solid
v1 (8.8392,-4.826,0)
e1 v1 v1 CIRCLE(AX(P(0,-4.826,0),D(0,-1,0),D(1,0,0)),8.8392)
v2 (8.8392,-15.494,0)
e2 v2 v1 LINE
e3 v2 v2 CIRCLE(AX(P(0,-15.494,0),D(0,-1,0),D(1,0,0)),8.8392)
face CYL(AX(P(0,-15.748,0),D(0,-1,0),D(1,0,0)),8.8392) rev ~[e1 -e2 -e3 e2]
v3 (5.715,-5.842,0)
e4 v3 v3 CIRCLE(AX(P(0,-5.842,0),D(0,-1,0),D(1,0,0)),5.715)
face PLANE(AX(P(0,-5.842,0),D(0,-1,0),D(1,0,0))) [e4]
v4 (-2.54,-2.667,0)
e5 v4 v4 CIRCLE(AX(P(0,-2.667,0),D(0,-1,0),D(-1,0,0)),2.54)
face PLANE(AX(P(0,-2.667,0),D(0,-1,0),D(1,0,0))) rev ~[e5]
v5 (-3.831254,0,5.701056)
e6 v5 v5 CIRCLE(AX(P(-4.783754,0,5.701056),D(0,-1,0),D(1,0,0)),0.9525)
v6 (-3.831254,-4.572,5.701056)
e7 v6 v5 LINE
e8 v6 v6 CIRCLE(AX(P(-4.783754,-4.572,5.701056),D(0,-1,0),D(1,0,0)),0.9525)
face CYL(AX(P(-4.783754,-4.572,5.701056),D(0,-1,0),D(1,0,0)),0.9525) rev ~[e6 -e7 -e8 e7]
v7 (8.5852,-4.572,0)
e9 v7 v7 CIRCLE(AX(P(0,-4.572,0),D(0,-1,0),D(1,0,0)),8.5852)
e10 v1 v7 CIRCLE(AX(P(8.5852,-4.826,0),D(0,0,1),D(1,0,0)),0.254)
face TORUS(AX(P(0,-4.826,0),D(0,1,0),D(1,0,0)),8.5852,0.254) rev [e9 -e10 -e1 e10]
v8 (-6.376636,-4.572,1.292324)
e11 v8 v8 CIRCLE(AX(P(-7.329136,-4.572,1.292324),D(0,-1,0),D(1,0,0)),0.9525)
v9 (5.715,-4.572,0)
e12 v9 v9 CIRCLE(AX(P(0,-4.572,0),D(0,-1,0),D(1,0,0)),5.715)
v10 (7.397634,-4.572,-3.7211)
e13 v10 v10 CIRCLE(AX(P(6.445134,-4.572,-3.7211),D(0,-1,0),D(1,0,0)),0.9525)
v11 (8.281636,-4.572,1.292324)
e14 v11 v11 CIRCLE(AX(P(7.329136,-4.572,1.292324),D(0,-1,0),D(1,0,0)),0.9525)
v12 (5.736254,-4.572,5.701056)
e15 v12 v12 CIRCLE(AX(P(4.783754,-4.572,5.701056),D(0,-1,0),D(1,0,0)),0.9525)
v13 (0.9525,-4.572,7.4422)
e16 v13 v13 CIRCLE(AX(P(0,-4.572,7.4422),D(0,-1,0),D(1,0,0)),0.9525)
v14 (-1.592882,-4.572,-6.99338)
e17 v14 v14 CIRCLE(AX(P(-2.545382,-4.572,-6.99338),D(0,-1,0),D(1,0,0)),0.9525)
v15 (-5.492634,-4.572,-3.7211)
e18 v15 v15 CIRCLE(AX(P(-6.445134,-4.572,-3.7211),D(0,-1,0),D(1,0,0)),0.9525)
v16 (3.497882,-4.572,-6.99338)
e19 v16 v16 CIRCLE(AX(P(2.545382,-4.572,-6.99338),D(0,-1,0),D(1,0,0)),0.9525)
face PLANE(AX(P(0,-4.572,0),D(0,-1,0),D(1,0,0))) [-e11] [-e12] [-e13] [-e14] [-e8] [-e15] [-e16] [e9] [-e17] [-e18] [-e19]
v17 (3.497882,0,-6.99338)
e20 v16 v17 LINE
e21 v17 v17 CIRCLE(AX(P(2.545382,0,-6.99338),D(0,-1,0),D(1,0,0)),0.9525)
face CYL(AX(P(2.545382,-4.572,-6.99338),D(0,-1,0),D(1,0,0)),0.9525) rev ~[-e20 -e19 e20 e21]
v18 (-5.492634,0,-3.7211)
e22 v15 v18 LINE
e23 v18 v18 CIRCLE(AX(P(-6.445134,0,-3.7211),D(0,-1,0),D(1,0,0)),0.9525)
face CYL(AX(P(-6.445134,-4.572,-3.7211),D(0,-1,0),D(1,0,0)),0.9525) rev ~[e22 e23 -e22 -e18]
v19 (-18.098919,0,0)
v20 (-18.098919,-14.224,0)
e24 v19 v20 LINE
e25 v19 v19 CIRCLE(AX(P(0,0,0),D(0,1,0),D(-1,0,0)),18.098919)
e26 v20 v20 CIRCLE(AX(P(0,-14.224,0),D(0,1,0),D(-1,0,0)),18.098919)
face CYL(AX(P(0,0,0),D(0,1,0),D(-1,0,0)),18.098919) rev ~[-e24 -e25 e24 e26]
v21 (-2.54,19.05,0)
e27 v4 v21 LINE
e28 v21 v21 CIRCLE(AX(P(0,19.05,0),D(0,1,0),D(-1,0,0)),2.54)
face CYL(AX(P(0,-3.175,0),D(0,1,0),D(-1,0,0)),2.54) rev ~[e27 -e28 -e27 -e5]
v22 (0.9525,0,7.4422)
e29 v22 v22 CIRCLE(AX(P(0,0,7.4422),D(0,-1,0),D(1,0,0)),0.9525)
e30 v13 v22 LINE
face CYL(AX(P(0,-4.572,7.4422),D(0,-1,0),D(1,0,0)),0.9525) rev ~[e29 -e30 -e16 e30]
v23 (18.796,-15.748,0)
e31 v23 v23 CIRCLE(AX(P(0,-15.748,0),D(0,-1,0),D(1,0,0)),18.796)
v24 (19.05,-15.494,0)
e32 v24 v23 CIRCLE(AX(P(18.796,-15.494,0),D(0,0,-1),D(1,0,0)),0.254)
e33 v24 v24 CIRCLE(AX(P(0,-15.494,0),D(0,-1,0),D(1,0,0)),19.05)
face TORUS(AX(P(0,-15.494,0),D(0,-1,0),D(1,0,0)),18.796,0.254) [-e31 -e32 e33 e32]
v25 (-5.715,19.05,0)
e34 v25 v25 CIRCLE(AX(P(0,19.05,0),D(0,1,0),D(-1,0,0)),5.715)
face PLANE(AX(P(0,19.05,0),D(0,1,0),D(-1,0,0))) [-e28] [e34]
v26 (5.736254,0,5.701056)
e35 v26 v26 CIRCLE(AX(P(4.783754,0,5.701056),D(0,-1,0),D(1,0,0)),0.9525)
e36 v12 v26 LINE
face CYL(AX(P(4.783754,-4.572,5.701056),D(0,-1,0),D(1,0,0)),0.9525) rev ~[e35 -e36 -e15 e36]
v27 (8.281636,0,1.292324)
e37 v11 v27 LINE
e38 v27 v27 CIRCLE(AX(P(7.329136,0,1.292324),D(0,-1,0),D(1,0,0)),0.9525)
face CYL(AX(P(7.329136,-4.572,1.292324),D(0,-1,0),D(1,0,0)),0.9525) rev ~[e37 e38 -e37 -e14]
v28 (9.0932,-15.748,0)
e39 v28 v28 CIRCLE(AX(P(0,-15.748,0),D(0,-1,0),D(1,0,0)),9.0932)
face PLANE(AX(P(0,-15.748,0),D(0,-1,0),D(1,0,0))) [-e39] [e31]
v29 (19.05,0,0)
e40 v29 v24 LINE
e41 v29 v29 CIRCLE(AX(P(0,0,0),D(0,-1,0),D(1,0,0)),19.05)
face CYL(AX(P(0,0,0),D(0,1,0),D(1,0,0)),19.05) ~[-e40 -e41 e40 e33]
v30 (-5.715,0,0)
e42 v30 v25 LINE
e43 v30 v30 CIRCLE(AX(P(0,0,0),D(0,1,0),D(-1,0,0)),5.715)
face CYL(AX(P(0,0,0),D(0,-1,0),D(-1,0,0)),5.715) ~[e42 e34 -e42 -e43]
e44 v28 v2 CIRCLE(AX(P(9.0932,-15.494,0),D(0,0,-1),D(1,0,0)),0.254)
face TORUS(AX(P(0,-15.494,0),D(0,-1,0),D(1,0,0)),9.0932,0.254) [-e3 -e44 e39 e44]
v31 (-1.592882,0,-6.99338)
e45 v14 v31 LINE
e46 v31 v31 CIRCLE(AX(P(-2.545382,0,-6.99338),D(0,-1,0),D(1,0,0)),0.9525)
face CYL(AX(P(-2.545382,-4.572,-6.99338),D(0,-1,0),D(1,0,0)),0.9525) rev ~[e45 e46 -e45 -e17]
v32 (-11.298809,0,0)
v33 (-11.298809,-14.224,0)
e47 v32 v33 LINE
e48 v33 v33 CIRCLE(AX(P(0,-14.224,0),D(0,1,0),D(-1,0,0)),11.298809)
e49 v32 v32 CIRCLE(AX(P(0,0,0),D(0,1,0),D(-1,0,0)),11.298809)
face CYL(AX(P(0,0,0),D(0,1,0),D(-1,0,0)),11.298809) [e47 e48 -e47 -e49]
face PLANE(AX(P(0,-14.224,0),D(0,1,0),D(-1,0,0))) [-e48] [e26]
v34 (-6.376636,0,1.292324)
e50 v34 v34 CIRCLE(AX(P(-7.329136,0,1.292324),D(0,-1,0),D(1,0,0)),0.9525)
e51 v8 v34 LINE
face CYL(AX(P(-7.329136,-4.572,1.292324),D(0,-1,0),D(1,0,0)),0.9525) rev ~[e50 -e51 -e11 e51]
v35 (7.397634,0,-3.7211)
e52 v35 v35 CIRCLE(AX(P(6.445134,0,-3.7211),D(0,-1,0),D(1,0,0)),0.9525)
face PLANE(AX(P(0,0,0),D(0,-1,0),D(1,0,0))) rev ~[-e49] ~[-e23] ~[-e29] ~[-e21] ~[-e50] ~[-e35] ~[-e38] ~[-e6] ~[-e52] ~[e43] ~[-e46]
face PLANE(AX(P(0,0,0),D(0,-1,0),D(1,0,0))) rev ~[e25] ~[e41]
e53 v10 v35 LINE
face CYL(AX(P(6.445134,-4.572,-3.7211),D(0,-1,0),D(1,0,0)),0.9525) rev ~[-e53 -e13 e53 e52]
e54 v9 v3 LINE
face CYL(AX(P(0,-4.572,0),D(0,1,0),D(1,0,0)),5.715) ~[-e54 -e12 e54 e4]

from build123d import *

# Parameters (mm, degrees)
F0_R      = 19.05
F1_DEPTH  = 15.748
F3_R      = 8.8392
F4_DEPTH  = 11.176
F5_R      = 0.254
F6_R      = 0.9525
F7_DEPTH  = 25.4
F8_R      = 5.715
F9_DEPTH  = 1.27
F11_R     = 18.0989194231
F11_R_2   = 11.2988088197
F12_DEPTH = 14.224
F10_R     = 5.715
F13_DEPTH = 19.05
F14_T     = 3.175


# Not quite as in the source:
# - a feature of the source that left no trace in its solid (it failed there, or was rolled back) is left out
# - a shell that OpenCascade refuses in one call is made with other operations: the cavity is built on its own and cut out


with BuildPart() as f1:
    # F0 (on Front) → F1 (new body)
    with BuildSketch(Plane.XZ):
        Circle(F0_R)
    extrude(amount=F1_DEPTH)

    # F3 (on face) → F4 (cut)
    with BuildSketch(Plane.XZ.offset(15.748)):
        Circle(F3_R)
    extrude(amount=-F4_DEPTH, mode=Mode.SUBTRACT)

    # F5
    f5_edges = [f1.edges().sort_by_distance(p)[0] for p in [
        (-8.8392, -15.748, 0),
        (8.8392, -10.16, 0),
        (-8.8392, -4.572, 0),
        (-19.05, -15.748, 0),
    ]]
    fillet(f5_edges, radius=F5_R)

    # F6 (on face) → F7 (cut)
    with BuildSketch(Plane.XZ.offset(4.572)):
        with Locations((0, 7.4422)):
            Circle(F6_R)
        with Locations((4.7837539488, 5.7010559546)):
            Circle(F6_R)
        with Locations((7.3291362595, 1.2923244678)):
            Circle(F6_R)
        with Locations((6.44513426, -3.7211)):
            Circle(F6_R)
        with Locations((2.5453823107, -6.9933804224)):
            Circle(F6_R)
        with Locations((-2.5453823107, -6.9933804224)):
            Circle(F6_R)
        with Locations((-6.44513426, -3.7211)):
            Circle(F6_R)
        with Locations((-7.3291362595, 1.2923244678)):
            Circle(F6_R)
        with Locations((-4.7837539488, 5.7010559546)):
            Circle(F6_R)
    extrude(amount=-F7_DEPTH, mode=Mode.SUBTRACT)

    # F8 (on face) → F9 (join)
    with BuildSketch(Plane.XZ.offset(4.572)):
        Circle(F8_R)
    extrude(amount=F9_DEPTH)

    # F11 (on face) → F12 (cut)
    with BuildSketch(Plane(origin=(0, 0, 0), x_dir=(-1, 0, 0), z_dir=(0, 1, 0))):
        Circle(F11_R)
        Circle(F11_R_2, mode=Mode.SUBTRACT)
    extrude(amount=-F12_DEPTH, mode=Mode.SUBTRACT)

    # F10 (on face) → F13 (join)
    with BuildSketch(Plane(origin=(0, 0, 0), x_dir=(-1, 0, 0), z_dir=(0, 1, 0))):
        Circle(F10_R)
    extrude(amount=F13_DEPTH)

    # F14: shell of thickness 3.175, made by hand


with BuildPart() as f14_core1:
    # F14_t2: copy of F1
    add(f1.part)

    # the walls: a layer under each face that stays
    f14_faces = [f14_core1.faces().sort_by_distance(p)[0] for p in [
        (-19.05, -7.747, 0),
        (-17.78, 0, -5.08),
        (-12.5306666667, -15.748, -12.5306666667),
        (18.0989194231, -7.112, 0),
        (12.065946282, -14.224, -12.065946282),
        (-8.8392, -10.16, 0),
        (11.2988088197, -7.112, 0),
        (-8.7648051224, -4.6463948776, 0),
        (-7.5325392131, 0, -7.5325392131),
        (-5.7234666667, -4.572, -5.7234666667),
        (-3.4978823107, -2.286, -6.9933804224),
        (-7.39763426, -2.286, -3.7211),
        (1.5928823107, -2.286, -6.9933804224),
        (5.715, 9.525, 0),
        (5.49263426, -2.286, -3.7211),
        (-8.2816362595, -2.286, 1.2923244678),
        (-5.7362539488, -2.286, 5.7010559546),
        (-0.9525, -2.286, 7.4422),
        (6.3766362595, -2.286, 1.2923244678),
        (3.8312539488, -2.286, 5.7010559546),
        (-5.715, -5.207, 0),
        (0, -5.842, 0),
    ]]
    thicken(f14_faces, amount=-F14_T, mode=Mode.SUBTRACT)

    # F14_s3 → F14_t4 (revolve, cut)
    with BuildSketch(Plane.XY):
        Polygon((-18.0671694231, -14.19225), (-21.2739194231, -14.224), (-21.2739194231, -17.399), (-18.0989194231, -17.399), align=None)
    revolve(axis=Axis((0, -14.224, 0), (0, 1, 0)), mode=Mode.SUBTRACT)

    # F14_s5 → F14_t6 (revolve, cut)
    with BuildSketch(Plane.XY):
        Polygon((-11.3305588197, -14.19225), (-11.2988088197, -17.399), (-8.1238088197, -17.399), (-8.1238088197, -14.224), align=None)
    revolve(axis=Axis((0, -14.224, 0), (0, 1, 0)), mode=Mode.SUBTRACT)

    # F14_s7 → F14_t8 (revolve, cut)
    with BuildSketch(Plane.XY):
        Polygon((-5.74675, 0.03175), (-5.715, -3.175), (-2.54, -3.175), (-2.54, 0), align=None)
    revolve(axis=Axis((0, 0, 0), (0, 1, 0)), mode=Mode.SUBTRACT)

    # F14_s9 → F14_t10 (revolve, cut)
    with BuildSketch(Plane.XY):
        Polygon((5.74675, -4.60375), (5.715, -1.397), (2.54, -1.397), (2.54, -4.572), align=None)
    revolve(axis=Axis((0, -4.572, 0), (0, -1, 0)), mode=Mode.SUBTRACT)


with BuildPart() as f1_1:
    add(f1.part)

    # what is left inside the walls is the cavity
    f14_cavity = [f14_core1.part.solids().sort_by_distance(p)[0] for p in [
        (2.50825, 4.572, 0),
    ]]
    add(f14_cavity, mode=Mode.SUBTRACT)


solid = f1_1.part
